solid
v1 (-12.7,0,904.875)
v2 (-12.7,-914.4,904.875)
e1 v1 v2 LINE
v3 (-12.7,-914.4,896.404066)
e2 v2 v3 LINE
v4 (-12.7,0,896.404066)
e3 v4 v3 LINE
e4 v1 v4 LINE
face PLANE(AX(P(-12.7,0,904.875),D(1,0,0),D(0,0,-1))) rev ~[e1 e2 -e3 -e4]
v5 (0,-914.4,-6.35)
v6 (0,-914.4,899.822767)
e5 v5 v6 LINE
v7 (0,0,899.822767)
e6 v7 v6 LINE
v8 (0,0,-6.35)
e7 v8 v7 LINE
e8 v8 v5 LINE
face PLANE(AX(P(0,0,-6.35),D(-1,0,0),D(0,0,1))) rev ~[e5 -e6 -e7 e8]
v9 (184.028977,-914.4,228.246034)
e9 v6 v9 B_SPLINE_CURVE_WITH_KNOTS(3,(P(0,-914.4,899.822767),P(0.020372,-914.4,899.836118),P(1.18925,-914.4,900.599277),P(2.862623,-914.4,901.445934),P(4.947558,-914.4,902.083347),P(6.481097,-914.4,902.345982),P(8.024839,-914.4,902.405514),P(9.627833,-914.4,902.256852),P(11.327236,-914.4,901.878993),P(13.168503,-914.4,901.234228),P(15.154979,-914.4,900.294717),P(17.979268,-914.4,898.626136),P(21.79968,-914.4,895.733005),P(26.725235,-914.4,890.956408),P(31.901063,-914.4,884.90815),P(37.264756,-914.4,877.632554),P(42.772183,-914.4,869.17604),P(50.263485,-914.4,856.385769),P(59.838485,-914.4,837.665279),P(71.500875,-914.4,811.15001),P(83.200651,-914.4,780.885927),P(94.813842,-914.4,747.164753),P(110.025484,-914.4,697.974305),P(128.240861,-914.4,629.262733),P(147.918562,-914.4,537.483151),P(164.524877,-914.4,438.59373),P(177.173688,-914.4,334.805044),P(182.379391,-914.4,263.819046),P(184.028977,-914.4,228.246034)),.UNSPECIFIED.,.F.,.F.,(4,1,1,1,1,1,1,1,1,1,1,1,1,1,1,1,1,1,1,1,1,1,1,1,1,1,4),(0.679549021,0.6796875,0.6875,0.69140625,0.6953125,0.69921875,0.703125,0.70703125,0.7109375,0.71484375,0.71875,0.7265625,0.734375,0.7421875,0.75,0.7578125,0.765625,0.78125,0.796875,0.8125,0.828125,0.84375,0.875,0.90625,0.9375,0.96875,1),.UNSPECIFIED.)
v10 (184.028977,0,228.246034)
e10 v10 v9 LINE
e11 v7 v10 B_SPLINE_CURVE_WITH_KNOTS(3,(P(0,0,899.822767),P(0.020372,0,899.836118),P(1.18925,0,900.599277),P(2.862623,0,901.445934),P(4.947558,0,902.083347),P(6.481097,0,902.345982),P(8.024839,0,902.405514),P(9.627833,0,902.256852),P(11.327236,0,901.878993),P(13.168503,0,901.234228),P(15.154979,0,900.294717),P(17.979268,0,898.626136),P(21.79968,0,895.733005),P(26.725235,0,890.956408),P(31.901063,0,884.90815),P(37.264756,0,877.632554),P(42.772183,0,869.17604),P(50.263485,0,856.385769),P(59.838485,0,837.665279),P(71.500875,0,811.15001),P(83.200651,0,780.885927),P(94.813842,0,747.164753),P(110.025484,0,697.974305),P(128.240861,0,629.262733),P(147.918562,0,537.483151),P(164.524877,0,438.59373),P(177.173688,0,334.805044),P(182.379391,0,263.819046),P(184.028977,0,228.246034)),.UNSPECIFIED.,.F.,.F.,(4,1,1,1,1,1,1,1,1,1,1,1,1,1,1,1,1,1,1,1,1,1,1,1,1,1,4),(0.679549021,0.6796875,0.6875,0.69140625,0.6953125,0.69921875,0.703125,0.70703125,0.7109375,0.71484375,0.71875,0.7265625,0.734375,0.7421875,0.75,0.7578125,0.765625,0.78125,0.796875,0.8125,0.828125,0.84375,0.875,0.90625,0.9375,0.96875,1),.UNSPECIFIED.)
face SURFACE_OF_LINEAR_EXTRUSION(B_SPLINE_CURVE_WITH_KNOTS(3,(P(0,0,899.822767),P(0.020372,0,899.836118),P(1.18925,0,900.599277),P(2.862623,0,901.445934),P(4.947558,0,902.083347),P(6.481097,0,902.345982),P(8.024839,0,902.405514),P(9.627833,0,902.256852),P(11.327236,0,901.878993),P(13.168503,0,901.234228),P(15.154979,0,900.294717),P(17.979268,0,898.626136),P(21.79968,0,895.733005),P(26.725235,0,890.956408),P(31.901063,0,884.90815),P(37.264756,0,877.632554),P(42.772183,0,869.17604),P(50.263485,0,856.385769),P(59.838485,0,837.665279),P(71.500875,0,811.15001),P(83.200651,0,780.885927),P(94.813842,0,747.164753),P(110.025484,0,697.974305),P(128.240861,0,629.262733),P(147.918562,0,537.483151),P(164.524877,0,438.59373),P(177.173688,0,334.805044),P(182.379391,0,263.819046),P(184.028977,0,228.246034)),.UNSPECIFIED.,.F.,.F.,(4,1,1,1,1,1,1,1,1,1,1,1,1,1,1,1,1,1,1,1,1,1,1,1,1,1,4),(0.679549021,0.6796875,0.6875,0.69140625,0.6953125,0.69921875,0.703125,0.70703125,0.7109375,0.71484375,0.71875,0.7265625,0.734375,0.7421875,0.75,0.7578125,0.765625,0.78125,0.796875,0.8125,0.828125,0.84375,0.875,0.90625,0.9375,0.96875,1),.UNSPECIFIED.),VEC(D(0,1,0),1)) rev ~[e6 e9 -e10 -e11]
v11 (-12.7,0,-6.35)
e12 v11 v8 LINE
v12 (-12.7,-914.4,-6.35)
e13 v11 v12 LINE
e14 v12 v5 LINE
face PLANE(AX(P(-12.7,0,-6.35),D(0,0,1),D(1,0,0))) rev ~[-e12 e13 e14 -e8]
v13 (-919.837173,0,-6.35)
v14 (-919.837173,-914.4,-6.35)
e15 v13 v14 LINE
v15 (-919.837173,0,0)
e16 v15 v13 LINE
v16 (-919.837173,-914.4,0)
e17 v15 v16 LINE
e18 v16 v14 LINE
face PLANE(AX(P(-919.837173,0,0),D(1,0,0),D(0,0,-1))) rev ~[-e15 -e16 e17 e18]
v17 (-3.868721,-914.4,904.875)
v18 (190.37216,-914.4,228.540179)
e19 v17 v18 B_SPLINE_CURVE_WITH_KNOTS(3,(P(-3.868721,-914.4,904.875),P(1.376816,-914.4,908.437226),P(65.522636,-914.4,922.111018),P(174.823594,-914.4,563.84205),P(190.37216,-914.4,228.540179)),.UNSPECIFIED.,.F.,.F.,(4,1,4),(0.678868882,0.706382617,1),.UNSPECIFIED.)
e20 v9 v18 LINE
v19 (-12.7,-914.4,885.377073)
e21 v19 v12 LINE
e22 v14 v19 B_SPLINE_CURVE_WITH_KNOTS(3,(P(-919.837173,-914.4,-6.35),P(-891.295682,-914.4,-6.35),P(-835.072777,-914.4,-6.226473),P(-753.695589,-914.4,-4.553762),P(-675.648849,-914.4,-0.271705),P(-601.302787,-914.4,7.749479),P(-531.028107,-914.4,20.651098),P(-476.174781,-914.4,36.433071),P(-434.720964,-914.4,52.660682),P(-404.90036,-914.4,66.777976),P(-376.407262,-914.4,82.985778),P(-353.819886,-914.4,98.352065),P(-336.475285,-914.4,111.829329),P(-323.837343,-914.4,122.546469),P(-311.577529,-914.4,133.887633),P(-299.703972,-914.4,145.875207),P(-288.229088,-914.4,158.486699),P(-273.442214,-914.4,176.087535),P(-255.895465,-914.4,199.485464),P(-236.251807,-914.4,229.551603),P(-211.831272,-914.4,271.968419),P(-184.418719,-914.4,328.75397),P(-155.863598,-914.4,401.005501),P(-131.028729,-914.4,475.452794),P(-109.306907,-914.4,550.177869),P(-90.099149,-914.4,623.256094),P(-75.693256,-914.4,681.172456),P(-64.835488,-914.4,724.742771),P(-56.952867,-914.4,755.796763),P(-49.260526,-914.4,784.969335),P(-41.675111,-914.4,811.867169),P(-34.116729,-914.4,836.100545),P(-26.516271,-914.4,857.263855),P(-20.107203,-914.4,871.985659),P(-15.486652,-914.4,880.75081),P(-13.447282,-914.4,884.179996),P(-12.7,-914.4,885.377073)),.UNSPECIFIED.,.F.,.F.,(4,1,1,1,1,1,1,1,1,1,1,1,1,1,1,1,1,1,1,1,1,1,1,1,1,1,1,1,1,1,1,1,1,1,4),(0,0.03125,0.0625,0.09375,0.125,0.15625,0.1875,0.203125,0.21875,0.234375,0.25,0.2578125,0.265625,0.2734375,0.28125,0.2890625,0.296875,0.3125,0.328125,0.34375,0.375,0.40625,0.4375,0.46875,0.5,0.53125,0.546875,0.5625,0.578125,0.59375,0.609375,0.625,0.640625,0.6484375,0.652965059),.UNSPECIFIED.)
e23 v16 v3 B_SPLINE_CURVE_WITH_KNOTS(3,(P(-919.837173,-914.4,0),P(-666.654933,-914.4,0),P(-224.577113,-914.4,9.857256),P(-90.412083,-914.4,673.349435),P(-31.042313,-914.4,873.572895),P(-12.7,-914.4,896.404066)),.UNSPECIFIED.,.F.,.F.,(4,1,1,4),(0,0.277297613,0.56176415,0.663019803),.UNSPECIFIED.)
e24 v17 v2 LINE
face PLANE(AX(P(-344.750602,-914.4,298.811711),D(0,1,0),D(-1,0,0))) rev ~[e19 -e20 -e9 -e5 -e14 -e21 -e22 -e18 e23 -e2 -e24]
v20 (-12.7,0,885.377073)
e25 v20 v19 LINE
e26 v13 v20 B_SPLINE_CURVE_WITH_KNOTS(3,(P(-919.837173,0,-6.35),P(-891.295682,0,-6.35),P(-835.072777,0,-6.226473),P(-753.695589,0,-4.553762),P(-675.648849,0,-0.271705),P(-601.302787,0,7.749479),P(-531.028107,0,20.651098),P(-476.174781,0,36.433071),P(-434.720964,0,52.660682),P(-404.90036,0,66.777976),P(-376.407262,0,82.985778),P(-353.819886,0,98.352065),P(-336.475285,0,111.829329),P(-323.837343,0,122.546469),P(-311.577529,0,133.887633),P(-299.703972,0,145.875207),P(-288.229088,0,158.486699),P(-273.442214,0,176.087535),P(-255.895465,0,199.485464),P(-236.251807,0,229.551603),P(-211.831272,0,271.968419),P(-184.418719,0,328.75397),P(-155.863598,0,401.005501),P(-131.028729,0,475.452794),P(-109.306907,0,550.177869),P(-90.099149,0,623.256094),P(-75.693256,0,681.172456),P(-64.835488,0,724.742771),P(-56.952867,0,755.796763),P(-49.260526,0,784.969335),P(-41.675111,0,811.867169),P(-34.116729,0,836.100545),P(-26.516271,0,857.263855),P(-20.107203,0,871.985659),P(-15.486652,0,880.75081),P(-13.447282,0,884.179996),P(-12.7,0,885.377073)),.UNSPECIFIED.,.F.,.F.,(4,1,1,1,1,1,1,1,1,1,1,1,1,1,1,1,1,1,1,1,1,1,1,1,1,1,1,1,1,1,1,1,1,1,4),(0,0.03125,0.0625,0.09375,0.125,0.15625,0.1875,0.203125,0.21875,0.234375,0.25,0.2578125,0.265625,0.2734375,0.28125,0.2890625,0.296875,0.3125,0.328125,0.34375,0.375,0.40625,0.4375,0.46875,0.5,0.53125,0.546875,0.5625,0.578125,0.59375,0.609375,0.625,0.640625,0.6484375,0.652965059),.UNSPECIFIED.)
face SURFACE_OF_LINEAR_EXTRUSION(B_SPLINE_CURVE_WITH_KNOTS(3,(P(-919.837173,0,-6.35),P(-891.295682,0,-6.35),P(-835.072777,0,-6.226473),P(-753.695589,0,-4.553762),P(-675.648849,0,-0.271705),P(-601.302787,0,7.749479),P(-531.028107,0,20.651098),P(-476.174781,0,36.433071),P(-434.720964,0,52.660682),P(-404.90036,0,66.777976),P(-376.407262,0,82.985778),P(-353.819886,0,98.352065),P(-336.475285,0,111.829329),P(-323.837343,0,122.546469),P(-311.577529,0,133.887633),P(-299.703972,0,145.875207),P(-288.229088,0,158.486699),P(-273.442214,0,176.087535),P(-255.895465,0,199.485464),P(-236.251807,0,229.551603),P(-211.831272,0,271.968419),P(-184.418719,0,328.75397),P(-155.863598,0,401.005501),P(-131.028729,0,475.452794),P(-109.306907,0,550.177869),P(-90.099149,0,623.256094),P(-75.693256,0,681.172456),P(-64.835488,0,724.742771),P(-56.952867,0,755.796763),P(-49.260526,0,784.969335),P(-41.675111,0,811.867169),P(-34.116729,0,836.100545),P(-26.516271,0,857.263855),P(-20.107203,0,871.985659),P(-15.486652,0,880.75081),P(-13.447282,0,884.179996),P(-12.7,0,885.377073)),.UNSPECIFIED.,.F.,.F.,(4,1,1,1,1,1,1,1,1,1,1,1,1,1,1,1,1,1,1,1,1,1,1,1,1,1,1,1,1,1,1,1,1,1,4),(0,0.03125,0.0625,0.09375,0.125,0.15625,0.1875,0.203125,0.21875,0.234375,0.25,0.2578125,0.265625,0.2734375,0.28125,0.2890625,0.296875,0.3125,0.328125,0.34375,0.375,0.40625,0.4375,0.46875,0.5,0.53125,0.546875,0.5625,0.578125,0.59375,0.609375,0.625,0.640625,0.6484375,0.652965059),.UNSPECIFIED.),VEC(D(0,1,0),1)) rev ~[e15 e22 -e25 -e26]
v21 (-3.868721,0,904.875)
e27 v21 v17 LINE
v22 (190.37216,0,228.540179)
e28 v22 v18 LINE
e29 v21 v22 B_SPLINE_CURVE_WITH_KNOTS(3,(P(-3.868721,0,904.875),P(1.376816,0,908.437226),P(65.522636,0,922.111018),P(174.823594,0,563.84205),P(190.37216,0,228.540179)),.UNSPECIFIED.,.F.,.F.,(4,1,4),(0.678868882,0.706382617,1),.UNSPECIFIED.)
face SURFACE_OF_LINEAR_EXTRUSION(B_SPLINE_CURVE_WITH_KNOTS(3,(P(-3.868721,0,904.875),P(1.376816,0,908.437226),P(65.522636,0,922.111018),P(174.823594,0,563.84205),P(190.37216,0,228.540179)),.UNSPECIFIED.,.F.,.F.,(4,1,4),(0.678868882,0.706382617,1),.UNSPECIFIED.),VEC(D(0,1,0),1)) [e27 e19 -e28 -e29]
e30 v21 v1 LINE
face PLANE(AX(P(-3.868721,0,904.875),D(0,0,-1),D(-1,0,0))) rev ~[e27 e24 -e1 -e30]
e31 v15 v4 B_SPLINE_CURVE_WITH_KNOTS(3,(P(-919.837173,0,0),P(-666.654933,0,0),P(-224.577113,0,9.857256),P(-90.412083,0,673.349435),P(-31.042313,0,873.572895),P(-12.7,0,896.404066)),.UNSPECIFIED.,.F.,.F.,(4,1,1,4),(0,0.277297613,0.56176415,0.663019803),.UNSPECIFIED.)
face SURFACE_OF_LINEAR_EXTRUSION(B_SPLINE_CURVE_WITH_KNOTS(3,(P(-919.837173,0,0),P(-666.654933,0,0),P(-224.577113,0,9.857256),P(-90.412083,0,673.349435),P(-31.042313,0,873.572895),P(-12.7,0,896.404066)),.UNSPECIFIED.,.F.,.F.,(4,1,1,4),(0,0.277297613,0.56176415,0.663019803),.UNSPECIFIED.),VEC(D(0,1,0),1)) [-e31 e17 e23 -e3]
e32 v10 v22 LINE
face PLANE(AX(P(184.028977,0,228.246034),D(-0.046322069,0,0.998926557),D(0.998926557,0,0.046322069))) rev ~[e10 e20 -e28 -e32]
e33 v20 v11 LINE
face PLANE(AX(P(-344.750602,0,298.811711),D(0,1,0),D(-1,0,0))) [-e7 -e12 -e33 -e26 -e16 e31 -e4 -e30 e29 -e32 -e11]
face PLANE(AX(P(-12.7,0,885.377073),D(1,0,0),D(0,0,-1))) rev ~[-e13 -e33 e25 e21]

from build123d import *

# Parameters (mm, degrees)
F1_DEPTH = 914.4


# Not quite as in the source:
# - ends of sketch curves that miss each other by under 0.0002 mm in the source are joined
# - the dataset's text gives a spline's control points without its knots; the knots are read off the source's solid


with BuildPart() as f1:
    # F0 (on Front) → F1 (new body)
    with BuildSketch(Plane.XZ):
        with BuildLine():
            add(Edge.make_bspline(
                [(-919.8371731596, 0), (-666.6549326545, 0), (-224.5771125372, 9.857256005), (-90.4120834618, 673.3494347676), (-31.042313376, 873.5728945456), (-12.7, 896.4040661924)],
                knots=[0, 0, 0, 0, 0.2772976129, 0.5617641499, 0.6630198034, 0.6630198034, 0.6630198034, 0.6630198034], degree=3))
            Line((-919.8371731596, 0), (-919.8371731596, -6.35))
            add(Edge.make_bspline(
                [(-919.8371731596, -6.35), (-891.2956817484, -6.35), (-835.0727771699, -6.2264734906), (-753.6955894076, -4.5537616294), (-675.6488494754, -0.2717047035), (-601.3027865804, 7.749478894), (-531.0281070337, 20.6510983897), (-476.1747806697, 36.433071437), (-434.7209643178, 52.6606822547), (-404.9003603349, 66.7779757198), (-376.407262262, 82.9857781471), (-353.8198862803, 98.3520654174), (-336.4752851305, 111.8293289531), (-323.8373430454, 122.5464690045), (-311.5775291009, 133.8876328292), (-299.7039715139, 145.875207016), (-288.2290876414, 158.4866993511), (-273.4422137623, 176.0875345027), (-255.8954652009, 199.4854636313), (-236.2518066429, 229.5516028845), (-211.8312721359, 271.9684188112), (-184.4187186541, 328.7539699263), (-155.8635982627, 401.0055012331), (-131.028728694, 475.4527935567), (-109.3069067738, 550.1778688522), (-90.0991494945, 623.2560938642), (-75.6932560314, 681.1724555189), (-64.8354875196, 724.7427710564), (-56.9528674516, 755.7967634626), (-49.2605256897, 784.9693353051), (-41.6751107234, 811.8671692139), (-34.1167291745, 836.1005454151), (-26.516271345, 857.2638545274), (-20.1072029881, 871.9856586334), (-15.4866518, 880.7508103168), (-13.4472817504, 884.1799958005), (-12.7, 885.3770727094)],
                knots=[0, 0, 0, 0, 0.03125, 0.0625, 0.09375, 0.125, 0.15625, 0.1875, 0.203125, 0.21875, 0.234375, 0.25, 0.2578125, 0.265625, 0.2734375, 0.28125, 0.2890625, 0.296875, 0.3125, 0.328125, 0.34375, 0.375, 0.40625, 0.4375, 0.46875, 0.5, 0.53125, 0.546875, 0.5625, 0.578125, 0.59375, 0.609375, 0.625, 0.640625, 0.6484375, 0.6529650593, 0.6529650593, 0.6529650593, 0.6529650593], degree=3))
            Line((-12.7, 885.3770727094), (-12.7, 896.4040661924))
        make_face()
        with BuildLine():
            Line((-12.7, 904.875), (-12.7, 896.4040661924))
            add(Edge.make_bspline(
                [(-12.7, 896.4040661924), (-9.8289625515, 899.9777238573), (-6.8903732232, 902.823006869), (-3.8687211654, 904.875)],
                knots=[0.6630198034, 0.6630198034, 0.6630198034, 0.6630198034, 0.6788688824, 0.6788688824, 0.6788688824, 0.6788688824], degree=3))
            Line((-3.8687211654, 904.875), (-12.7, 904.875))
        make_face()
        with BuildLine():
            add(Edge.make_bspline(
                [(-12.7, 896.4040661924), (-9.8289625515, 899.9777238573), (-6.8903732232, 902.823006869), (-3.8687211654, 904.875)],
                knots=[0.6630198034, 0.6630198034, 0.6630198034, 0.6630198034, 0.6788688824, 0.6788688824, 0.6788688824, 0.6788688824], degree=3))
            Line((-12.7, 896.4040661924), (-12.7, 885.3770727094))
            add(Edge.make_bspline(
                [(-12.7, 885.3770727094), (-12.1578146641, 886.2456039503), (-10.327872538, 889.0711046998), (-7.2271290281, 893.2451337506), (-3.4946018732, 897.2220843222), (-1.1289437839, 899.0829033781), (0, 899.8227670823)],
                knots=[0.6529650593, 0.6529650593, 0.6529650593, 0.6529650593, 0.65625, 0.6640625, 0.671875, 0.6795490215, 0.6795490215, 0.6795490215, 0.6795490215], degree=3))
            Line((0, 899.8227670823), (0, 904.875))
            Line((0, 904.875), (-3.8687211654, 904.875))
        make_face()
        with BuildLine():
            add(Edge.make_bspline(
                [(-3.8687211654, 904.875), (1.3768159503, 908.437225539), (65.5226358054, 922.1110182588), (174.8235935542, 563.8420495299), (190.3721604559, 228.5401790035)],
                knots=[0.6788688824, 0.6788688824, 0.6788688824, 0.6788688824, 0.7063826167, 1, 1, 1, 1], degree=3))
            Line((-3.8687211654, 904.875), (0, 904.875))
            Line((0, 904.875), (0, 899.8227670823))
            add(Edge.make_bspline(
                [(0, 899.8227670823), (0.0203719127, 899.8361180029), (1.1892498099, 900.5992765813), (2.8626228855, 901.4459342147), (4.9475578198, 902.0833471344), (6.4810971063, 902.345982062), (8.0248389444, 902.405514015), (9.6278327514, 902.2568516663), (11.3272360125, 901.8789926921), (13.1685034705, 901.2342275997), (15.1549787651, 900.2947169392), (17.9792683036, 898.6261359239), (21.7996798698, 895.7330053245), (26.7252350861, 890.9564075118), (31.9010627331, 884.9081499112), (37.2647559638, 877.6325543579), (42.7721833661, 869.1760396376), (50.2634852549, 856.3857689099), (59.838484806, 837.6652789081), (71.5008754365, 811.1500097706), (83.2006513672, 780.8859268301), (94.8138420689, 747.1647527149), (110.0254840172, 697.9743051355), (128.2408613675, 629.2627330137), (147.9185624169, 537.4831514486), (164.5248766535, 438.5937295745), (177.1736880039, 334.8050437488), (182.3793905406, 263.8190463883), (184.0289768201, 228.246033865)],
                knots=[0.6795490215, 0.6795490215, 0.6795490215, 0.6795490215, 0.6796875, 0.6875, 0.69140625, 0.6953125, 0.69921875, 0.703125, 0.70703125, 0.7109375, 0.71484375, 0.71875, 0.7265625, 0.734375, 0.7421875, 0.75, 0.7578125, 0.765625, 0.78125, 0.796875, 0.8125, 0.828125, 0.84375, 0.875, 0.90625, 0.9375, 0.96875, 1, 1, 1, 1], degree=3))
            Line((184.0289768201, 228.246033865), (190.3721604559, 228.5401790035))
        make_face()
        with BuildLine():
            add(Edge.make_bspline(
                [(-12.7, 885.3770727094), (-12.1578146641, 886.2456039503), (-10.327872538, 889.0711046998), (-7.2271290281, 893.2451337506), (-3.4946018732, 897.2220843222), (-1.1289437839, 899.0829033781), (0, 899.8227670823)],
                knots=[0.6529650593, 0.6529650593, 0.6529650593, 0.6529650593, 0.65625, 0.6640625, 0.671875, 0.6795490215, 0.6795490215, 0.6795490215, 0.6795490215], degree=3))
            Line((-12.7, 885.3770727094), (-12.7, -6.35))
            Line((-12.7, -6.35), (0, -6.35))
            Line((0, -6.35), (0, 899.8227670823))
        make_face()
    extrude(amount=F1_DEPTH)


solid = f1.part
